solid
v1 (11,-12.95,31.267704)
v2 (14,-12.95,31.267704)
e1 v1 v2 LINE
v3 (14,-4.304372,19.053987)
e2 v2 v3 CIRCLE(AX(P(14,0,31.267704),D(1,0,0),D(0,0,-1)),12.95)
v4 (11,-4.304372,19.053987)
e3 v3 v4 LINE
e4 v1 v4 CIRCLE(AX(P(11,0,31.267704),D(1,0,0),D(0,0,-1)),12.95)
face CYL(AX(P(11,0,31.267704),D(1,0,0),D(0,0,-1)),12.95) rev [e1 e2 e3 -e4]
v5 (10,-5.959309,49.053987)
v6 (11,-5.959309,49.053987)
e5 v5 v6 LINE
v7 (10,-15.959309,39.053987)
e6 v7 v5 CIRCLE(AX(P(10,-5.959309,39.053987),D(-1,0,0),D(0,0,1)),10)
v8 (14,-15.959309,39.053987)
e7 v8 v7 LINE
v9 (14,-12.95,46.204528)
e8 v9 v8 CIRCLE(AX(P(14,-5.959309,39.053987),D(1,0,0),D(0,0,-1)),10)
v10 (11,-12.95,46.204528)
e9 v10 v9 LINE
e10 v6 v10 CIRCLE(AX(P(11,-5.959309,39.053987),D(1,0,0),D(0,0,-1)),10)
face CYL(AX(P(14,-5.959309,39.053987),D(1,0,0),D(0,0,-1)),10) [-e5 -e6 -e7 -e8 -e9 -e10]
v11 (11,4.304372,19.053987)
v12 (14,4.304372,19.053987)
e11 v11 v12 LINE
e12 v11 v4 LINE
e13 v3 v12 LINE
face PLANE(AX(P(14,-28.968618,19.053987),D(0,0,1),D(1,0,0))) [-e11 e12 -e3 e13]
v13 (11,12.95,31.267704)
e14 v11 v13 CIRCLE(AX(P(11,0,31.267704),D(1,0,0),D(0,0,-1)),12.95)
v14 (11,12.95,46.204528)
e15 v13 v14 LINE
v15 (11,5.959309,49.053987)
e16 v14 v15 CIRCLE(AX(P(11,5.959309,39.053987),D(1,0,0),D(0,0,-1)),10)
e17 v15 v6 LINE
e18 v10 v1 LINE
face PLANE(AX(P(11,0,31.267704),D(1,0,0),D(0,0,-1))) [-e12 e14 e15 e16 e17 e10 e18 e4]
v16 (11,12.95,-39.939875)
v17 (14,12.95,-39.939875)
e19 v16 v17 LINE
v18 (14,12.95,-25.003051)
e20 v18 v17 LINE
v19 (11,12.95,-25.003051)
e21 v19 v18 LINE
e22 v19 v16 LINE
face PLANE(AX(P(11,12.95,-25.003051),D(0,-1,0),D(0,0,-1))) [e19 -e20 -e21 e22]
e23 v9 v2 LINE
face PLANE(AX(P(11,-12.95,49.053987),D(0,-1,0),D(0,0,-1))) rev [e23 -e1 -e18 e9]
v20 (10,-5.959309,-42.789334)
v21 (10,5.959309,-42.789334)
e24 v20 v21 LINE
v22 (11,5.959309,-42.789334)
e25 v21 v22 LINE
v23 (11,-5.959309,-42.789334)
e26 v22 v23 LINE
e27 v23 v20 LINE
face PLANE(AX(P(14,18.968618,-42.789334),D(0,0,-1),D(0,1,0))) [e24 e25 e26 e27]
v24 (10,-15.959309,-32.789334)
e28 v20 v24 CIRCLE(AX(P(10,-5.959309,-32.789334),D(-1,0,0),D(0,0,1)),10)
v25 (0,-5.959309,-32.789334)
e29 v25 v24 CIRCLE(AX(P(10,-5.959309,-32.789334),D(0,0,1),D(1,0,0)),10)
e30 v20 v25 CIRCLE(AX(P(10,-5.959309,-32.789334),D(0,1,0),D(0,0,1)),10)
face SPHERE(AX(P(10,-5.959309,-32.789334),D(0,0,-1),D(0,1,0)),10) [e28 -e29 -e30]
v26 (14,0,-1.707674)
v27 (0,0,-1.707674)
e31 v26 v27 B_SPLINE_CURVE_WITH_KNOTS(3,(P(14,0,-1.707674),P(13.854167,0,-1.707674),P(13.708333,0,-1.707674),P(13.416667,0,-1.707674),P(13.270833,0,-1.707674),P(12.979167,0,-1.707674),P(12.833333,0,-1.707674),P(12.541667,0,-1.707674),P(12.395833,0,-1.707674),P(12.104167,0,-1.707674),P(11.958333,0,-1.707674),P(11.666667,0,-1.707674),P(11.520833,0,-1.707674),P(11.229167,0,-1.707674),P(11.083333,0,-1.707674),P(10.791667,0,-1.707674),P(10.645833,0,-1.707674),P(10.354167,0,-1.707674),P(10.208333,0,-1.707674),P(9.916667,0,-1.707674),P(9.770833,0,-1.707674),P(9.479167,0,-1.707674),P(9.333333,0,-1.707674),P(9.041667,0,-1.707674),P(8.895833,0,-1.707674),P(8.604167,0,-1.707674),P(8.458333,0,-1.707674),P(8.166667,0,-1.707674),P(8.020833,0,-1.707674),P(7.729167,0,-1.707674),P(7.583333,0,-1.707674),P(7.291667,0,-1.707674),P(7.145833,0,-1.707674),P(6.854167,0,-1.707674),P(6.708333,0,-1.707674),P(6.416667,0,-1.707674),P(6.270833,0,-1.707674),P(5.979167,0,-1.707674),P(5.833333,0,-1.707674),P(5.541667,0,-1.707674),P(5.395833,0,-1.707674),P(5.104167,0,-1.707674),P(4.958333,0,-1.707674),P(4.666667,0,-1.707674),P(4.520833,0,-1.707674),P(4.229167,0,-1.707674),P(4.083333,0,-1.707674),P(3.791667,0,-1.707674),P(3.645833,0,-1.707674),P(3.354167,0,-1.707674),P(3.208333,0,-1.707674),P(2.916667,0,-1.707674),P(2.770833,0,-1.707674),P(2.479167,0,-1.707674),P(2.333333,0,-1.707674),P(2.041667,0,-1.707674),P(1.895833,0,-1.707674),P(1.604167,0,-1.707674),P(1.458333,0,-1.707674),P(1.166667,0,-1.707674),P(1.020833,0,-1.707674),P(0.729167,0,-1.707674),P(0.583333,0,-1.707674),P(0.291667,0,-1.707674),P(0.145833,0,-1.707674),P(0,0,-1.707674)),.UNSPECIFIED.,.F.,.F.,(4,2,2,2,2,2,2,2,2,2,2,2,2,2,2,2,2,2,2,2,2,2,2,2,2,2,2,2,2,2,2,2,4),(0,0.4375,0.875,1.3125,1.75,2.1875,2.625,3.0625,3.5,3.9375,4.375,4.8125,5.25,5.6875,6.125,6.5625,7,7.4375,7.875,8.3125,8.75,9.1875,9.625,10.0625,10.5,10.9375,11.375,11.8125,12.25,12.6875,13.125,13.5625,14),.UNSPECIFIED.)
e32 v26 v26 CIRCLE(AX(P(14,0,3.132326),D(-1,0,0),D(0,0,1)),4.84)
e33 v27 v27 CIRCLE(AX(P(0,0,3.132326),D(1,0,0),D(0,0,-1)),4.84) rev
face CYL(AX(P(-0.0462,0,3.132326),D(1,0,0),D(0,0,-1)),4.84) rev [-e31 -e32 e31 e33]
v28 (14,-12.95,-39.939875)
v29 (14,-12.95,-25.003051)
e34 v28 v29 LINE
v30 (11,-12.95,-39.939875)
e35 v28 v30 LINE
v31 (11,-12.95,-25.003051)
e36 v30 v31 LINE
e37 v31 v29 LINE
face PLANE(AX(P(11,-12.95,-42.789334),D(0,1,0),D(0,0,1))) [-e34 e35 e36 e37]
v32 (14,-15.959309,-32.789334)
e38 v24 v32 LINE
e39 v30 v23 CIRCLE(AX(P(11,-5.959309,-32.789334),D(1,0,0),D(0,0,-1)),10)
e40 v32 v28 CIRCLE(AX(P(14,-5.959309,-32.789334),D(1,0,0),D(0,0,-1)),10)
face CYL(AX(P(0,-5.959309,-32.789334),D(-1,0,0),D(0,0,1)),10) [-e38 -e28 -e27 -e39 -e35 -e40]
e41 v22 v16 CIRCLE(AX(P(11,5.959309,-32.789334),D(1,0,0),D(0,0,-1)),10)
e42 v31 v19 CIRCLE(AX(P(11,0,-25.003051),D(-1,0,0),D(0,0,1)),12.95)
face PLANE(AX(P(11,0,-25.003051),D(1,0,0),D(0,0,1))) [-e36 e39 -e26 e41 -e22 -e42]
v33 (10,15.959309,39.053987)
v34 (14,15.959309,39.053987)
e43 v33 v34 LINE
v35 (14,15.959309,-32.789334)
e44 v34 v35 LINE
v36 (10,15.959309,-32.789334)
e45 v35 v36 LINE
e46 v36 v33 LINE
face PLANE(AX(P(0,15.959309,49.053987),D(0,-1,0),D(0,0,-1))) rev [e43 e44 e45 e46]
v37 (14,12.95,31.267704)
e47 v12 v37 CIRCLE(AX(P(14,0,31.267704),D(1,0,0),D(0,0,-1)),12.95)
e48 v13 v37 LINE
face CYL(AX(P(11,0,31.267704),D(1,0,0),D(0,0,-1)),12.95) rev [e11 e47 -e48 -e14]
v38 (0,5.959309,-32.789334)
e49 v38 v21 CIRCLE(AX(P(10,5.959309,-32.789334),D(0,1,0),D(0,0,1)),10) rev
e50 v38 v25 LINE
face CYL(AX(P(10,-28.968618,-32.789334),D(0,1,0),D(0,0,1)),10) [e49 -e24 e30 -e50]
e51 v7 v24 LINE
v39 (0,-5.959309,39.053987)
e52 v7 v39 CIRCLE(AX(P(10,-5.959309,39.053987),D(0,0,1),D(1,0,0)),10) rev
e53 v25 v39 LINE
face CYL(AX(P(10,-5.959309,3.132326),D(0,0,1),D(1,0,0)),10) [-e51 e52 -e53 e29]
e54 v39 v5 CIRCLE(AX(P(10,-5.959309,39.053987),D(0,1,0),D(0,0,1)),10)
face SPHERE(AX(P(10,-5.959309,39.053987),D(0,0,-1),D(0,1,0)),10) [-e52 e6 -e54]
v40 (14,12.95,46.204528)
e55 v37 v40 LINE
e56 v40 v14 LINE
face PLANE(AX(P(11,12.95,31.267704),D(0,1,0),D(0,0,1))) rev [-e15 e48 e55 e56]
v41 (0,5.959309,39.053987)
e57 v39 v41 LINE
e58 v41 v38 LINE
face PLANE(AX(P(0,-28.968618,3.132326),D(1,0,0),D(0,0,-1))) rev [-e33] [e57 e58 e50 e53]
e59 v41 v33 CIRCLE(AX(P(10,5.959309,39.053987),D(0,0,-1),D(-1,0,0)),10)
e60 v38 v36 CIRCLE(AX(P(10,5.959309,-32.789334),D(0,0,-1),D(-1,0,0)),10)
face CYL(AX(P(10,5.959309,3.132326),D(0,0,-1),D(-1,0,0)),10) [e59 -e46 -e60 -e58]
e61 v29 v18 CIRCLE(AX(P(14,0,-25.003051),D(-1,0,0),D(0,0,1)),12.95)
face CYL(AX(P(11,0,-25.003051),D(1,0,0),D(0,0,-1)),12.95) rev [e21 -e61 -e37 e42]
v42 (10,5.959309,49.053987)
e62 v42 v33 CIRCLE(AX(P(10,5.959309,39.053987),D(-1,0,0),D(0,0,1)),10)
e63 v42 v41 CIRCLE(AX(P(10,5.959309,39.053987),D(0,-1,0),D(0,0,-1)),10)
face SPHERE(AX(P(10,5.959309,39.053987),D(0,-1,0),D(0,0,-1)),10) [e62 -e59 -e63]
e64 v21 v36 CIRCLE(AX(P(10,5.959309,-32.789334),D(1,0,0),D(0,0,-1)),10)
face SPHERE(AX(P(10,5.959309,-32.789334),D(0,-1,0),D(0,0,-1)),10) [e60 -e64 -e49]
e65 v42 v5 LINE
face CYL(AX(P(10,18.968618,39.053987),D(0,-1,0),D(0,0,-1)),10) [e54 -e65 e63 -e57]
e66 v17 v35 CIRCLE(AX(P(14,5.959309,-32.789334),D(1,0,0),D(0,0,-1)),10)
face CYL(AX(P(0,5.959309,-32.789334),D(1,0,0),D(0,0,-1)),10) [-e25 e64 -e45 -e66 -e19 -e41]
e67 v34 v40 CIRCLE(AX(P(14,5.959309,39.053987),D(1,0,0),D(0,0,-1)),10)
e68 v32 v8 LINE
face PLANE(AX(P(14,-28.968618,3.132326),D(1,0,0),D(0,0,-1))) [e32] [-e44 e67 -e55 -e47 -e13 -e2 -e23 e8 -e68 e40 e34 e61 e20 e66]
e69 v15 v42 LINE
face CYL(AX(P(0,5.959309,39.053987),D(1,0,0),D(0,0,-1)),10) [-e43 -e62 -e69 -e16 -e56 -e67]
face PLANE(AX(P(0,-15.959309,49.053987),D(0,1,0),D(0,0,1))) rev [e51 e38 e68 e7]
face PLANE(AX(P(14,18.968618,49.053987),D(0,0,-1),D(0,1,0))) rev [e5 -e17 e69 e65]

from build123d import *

# Parameters (mm, degrees)
BOSS_EXTRUDE3_DEPTH = 14
SKETCH3_R           = 4.84
CUT_EXTRUDE3_DEPTH  = 14.0462
CUT_EXTRUDE4_DEPTH  = 3
SKETCH6_W           = 32.77755098
SKETCH6_H           = 97.199429117
CUT_EXTRUDE6_DEPTH  = 68.951679292
FILLET1_R           = 10
FILLET2_R           = 10
FILLET3_R           = 10
FILLET4_R           = 10


with BuildPart() as part:
    # Sketch1 → Boss-Extrude3 (new body)
    with BuildSketch(Plane.YZ):
        with BuildLine():
            Line((-28.968617751, -12.789334175), (28.968617751, -12.789334175))
            ThreePointArc((28.968617751, -12.789334175), (44.579120821, 0), (35.110840206, 17.821518929))
            ThreePointArc((35.110840206, 17.821518929), (30.644623053, 21.505675602), (28.968617751, 27.047436358))
            Line((28.968617751, 27.047436358), (28.968617751, 39.053986921))
            ThreePointArc((28.968617751, 39.053986921), (26.039685563, 46.125054733), (18.968617751, 49.053986921))
            Line((18.968617751, 49.053986921), (-18.968617751, 49.053986921))
            ThreePointArc((-18.968617751, 49.053986921), (-26.039685563, 46.125054733), (-28.968617751, 39.053986921))
            Line((-28.968617751, 39.053986921), (-28.968617751, 27.047436358))
            ThreePointArc((-28.968617751, 27.047436358), (-30.644623053, 21.505675602), (-35.110840206, 17.821518929))
            ThreePointArc((-35.110840206, 17.821518929), (-44.579120821, 0), (-28.968617751, -12.789334175))
        make_face()
    boss_extrude3 = extrude(amount=BOSS_EXTRUDE3_DEPTH)

    # Sketch3 → Cut-Extrude3 (cut)
    with BuildSketch(Plane.YZ.offset(14)):
        with Locations((0, 3.132326373)):
            Circle(SKETCH3_R)
    cut_extrude3 = extrude(amount=-CUT_EXTRUDE3_DEPTH, mode=Mode.SUBTRACT)

    # Sketch4 → Cut-Extrude4 (cut)
    with BuildSketch(Plane.YZ.offset(14)):
        with BuildLine():
            Line((-12.95, 49.053986921), (-12.95, 31.267703884))
            ThreePointArc((-12.95, 31.267703884), (0, 18.317703884), (12.95, 31.267703884))
            Line((12.95, 31.267703884), (12.95, 49.053986921))
            Line((12.95, 49.053986921), (-12.95, 49.053986921))
        make_face()
    cut_extrude4 = extrude(amount=-CUT_EXTRUDE4_DEPTH, mode=Mode.SUBTRACT)

    # Mirror1: Boss-Extrude3, Cut-Extrude3, Cut-Extrude4 across plane
    add(boss_extrude3.mirror(Plane.XY.offset(3.132326373)))
    add(cut_extrude3.mirror(Plane.XY.offset(3.132326373)), mode=Mode.SUBTRACT)
    add(cut_extrude4.mirror(Plane.XY.offset(3.132326373)), mode=Mode.SUBTRACT)

    # Sketch6 → Cut-Extrude6 (cut, through all)
    with BuildSketch(Plane.YZ.offset(14)):
        with Locations((-32.348084365, 0.454272362)):
            Rectangle(SKETCH6_W, SKETCH6_H)
        with Locations((32.348084365, 0.454272362)):
            Rectangle(SKETCH6_W, SKETCH6_H)
    extrude(amount=-CUT_EXTRUDE6_DEPTH, mode=Mode.SUBTRACT)

    # Fillet1
    fillet1_edges = [part.edges().sort_by_distance(p)[0] for p in [
        (0, -15.959308875, 3.132326373),
    ]]
    fillet(fillet1_edges, radius=FILLET1_R)

    # Fillet2
    fillet2_edges = [part.edges().sort_by_distance(p)[0] for p in [
        (0, 5, -42.789334175),
        (2.928932188, -13.030376687, -42.789334175),
        (12, -15.959308875, -42.789334175),
    ]]
    fillet(fillet2_edges, radius=FILLET2_R)

    # Fillet3
    fillet3_edges = [part.edges().sort_by_distance(p)[0] for p in [
        (0, 5, 49.053986921),
        (2.928932188, -13.030376687, 49.053986921),
        (12, -15.959308875, 49.053986921),
    ]]
    fillet(fillet3_edges, radius=FILLET3_R)

    # Fillet4
    fillet4_edges = [part.edges().sort_by_distance(p)[0] for p in [
        (12, 15.959308875, -42.789334175),
        (2.928932188, 15.959308875, -39.860401987),
        (0, 15.959308875, 3.132326373),
        (2.928932188, 15.959308875, 46.125054733),
        (12, 15.959308875, 49.053986921),
    ]]
    fillet(fillet4_edges, radius=FILLET4_R)


solid = part.part
